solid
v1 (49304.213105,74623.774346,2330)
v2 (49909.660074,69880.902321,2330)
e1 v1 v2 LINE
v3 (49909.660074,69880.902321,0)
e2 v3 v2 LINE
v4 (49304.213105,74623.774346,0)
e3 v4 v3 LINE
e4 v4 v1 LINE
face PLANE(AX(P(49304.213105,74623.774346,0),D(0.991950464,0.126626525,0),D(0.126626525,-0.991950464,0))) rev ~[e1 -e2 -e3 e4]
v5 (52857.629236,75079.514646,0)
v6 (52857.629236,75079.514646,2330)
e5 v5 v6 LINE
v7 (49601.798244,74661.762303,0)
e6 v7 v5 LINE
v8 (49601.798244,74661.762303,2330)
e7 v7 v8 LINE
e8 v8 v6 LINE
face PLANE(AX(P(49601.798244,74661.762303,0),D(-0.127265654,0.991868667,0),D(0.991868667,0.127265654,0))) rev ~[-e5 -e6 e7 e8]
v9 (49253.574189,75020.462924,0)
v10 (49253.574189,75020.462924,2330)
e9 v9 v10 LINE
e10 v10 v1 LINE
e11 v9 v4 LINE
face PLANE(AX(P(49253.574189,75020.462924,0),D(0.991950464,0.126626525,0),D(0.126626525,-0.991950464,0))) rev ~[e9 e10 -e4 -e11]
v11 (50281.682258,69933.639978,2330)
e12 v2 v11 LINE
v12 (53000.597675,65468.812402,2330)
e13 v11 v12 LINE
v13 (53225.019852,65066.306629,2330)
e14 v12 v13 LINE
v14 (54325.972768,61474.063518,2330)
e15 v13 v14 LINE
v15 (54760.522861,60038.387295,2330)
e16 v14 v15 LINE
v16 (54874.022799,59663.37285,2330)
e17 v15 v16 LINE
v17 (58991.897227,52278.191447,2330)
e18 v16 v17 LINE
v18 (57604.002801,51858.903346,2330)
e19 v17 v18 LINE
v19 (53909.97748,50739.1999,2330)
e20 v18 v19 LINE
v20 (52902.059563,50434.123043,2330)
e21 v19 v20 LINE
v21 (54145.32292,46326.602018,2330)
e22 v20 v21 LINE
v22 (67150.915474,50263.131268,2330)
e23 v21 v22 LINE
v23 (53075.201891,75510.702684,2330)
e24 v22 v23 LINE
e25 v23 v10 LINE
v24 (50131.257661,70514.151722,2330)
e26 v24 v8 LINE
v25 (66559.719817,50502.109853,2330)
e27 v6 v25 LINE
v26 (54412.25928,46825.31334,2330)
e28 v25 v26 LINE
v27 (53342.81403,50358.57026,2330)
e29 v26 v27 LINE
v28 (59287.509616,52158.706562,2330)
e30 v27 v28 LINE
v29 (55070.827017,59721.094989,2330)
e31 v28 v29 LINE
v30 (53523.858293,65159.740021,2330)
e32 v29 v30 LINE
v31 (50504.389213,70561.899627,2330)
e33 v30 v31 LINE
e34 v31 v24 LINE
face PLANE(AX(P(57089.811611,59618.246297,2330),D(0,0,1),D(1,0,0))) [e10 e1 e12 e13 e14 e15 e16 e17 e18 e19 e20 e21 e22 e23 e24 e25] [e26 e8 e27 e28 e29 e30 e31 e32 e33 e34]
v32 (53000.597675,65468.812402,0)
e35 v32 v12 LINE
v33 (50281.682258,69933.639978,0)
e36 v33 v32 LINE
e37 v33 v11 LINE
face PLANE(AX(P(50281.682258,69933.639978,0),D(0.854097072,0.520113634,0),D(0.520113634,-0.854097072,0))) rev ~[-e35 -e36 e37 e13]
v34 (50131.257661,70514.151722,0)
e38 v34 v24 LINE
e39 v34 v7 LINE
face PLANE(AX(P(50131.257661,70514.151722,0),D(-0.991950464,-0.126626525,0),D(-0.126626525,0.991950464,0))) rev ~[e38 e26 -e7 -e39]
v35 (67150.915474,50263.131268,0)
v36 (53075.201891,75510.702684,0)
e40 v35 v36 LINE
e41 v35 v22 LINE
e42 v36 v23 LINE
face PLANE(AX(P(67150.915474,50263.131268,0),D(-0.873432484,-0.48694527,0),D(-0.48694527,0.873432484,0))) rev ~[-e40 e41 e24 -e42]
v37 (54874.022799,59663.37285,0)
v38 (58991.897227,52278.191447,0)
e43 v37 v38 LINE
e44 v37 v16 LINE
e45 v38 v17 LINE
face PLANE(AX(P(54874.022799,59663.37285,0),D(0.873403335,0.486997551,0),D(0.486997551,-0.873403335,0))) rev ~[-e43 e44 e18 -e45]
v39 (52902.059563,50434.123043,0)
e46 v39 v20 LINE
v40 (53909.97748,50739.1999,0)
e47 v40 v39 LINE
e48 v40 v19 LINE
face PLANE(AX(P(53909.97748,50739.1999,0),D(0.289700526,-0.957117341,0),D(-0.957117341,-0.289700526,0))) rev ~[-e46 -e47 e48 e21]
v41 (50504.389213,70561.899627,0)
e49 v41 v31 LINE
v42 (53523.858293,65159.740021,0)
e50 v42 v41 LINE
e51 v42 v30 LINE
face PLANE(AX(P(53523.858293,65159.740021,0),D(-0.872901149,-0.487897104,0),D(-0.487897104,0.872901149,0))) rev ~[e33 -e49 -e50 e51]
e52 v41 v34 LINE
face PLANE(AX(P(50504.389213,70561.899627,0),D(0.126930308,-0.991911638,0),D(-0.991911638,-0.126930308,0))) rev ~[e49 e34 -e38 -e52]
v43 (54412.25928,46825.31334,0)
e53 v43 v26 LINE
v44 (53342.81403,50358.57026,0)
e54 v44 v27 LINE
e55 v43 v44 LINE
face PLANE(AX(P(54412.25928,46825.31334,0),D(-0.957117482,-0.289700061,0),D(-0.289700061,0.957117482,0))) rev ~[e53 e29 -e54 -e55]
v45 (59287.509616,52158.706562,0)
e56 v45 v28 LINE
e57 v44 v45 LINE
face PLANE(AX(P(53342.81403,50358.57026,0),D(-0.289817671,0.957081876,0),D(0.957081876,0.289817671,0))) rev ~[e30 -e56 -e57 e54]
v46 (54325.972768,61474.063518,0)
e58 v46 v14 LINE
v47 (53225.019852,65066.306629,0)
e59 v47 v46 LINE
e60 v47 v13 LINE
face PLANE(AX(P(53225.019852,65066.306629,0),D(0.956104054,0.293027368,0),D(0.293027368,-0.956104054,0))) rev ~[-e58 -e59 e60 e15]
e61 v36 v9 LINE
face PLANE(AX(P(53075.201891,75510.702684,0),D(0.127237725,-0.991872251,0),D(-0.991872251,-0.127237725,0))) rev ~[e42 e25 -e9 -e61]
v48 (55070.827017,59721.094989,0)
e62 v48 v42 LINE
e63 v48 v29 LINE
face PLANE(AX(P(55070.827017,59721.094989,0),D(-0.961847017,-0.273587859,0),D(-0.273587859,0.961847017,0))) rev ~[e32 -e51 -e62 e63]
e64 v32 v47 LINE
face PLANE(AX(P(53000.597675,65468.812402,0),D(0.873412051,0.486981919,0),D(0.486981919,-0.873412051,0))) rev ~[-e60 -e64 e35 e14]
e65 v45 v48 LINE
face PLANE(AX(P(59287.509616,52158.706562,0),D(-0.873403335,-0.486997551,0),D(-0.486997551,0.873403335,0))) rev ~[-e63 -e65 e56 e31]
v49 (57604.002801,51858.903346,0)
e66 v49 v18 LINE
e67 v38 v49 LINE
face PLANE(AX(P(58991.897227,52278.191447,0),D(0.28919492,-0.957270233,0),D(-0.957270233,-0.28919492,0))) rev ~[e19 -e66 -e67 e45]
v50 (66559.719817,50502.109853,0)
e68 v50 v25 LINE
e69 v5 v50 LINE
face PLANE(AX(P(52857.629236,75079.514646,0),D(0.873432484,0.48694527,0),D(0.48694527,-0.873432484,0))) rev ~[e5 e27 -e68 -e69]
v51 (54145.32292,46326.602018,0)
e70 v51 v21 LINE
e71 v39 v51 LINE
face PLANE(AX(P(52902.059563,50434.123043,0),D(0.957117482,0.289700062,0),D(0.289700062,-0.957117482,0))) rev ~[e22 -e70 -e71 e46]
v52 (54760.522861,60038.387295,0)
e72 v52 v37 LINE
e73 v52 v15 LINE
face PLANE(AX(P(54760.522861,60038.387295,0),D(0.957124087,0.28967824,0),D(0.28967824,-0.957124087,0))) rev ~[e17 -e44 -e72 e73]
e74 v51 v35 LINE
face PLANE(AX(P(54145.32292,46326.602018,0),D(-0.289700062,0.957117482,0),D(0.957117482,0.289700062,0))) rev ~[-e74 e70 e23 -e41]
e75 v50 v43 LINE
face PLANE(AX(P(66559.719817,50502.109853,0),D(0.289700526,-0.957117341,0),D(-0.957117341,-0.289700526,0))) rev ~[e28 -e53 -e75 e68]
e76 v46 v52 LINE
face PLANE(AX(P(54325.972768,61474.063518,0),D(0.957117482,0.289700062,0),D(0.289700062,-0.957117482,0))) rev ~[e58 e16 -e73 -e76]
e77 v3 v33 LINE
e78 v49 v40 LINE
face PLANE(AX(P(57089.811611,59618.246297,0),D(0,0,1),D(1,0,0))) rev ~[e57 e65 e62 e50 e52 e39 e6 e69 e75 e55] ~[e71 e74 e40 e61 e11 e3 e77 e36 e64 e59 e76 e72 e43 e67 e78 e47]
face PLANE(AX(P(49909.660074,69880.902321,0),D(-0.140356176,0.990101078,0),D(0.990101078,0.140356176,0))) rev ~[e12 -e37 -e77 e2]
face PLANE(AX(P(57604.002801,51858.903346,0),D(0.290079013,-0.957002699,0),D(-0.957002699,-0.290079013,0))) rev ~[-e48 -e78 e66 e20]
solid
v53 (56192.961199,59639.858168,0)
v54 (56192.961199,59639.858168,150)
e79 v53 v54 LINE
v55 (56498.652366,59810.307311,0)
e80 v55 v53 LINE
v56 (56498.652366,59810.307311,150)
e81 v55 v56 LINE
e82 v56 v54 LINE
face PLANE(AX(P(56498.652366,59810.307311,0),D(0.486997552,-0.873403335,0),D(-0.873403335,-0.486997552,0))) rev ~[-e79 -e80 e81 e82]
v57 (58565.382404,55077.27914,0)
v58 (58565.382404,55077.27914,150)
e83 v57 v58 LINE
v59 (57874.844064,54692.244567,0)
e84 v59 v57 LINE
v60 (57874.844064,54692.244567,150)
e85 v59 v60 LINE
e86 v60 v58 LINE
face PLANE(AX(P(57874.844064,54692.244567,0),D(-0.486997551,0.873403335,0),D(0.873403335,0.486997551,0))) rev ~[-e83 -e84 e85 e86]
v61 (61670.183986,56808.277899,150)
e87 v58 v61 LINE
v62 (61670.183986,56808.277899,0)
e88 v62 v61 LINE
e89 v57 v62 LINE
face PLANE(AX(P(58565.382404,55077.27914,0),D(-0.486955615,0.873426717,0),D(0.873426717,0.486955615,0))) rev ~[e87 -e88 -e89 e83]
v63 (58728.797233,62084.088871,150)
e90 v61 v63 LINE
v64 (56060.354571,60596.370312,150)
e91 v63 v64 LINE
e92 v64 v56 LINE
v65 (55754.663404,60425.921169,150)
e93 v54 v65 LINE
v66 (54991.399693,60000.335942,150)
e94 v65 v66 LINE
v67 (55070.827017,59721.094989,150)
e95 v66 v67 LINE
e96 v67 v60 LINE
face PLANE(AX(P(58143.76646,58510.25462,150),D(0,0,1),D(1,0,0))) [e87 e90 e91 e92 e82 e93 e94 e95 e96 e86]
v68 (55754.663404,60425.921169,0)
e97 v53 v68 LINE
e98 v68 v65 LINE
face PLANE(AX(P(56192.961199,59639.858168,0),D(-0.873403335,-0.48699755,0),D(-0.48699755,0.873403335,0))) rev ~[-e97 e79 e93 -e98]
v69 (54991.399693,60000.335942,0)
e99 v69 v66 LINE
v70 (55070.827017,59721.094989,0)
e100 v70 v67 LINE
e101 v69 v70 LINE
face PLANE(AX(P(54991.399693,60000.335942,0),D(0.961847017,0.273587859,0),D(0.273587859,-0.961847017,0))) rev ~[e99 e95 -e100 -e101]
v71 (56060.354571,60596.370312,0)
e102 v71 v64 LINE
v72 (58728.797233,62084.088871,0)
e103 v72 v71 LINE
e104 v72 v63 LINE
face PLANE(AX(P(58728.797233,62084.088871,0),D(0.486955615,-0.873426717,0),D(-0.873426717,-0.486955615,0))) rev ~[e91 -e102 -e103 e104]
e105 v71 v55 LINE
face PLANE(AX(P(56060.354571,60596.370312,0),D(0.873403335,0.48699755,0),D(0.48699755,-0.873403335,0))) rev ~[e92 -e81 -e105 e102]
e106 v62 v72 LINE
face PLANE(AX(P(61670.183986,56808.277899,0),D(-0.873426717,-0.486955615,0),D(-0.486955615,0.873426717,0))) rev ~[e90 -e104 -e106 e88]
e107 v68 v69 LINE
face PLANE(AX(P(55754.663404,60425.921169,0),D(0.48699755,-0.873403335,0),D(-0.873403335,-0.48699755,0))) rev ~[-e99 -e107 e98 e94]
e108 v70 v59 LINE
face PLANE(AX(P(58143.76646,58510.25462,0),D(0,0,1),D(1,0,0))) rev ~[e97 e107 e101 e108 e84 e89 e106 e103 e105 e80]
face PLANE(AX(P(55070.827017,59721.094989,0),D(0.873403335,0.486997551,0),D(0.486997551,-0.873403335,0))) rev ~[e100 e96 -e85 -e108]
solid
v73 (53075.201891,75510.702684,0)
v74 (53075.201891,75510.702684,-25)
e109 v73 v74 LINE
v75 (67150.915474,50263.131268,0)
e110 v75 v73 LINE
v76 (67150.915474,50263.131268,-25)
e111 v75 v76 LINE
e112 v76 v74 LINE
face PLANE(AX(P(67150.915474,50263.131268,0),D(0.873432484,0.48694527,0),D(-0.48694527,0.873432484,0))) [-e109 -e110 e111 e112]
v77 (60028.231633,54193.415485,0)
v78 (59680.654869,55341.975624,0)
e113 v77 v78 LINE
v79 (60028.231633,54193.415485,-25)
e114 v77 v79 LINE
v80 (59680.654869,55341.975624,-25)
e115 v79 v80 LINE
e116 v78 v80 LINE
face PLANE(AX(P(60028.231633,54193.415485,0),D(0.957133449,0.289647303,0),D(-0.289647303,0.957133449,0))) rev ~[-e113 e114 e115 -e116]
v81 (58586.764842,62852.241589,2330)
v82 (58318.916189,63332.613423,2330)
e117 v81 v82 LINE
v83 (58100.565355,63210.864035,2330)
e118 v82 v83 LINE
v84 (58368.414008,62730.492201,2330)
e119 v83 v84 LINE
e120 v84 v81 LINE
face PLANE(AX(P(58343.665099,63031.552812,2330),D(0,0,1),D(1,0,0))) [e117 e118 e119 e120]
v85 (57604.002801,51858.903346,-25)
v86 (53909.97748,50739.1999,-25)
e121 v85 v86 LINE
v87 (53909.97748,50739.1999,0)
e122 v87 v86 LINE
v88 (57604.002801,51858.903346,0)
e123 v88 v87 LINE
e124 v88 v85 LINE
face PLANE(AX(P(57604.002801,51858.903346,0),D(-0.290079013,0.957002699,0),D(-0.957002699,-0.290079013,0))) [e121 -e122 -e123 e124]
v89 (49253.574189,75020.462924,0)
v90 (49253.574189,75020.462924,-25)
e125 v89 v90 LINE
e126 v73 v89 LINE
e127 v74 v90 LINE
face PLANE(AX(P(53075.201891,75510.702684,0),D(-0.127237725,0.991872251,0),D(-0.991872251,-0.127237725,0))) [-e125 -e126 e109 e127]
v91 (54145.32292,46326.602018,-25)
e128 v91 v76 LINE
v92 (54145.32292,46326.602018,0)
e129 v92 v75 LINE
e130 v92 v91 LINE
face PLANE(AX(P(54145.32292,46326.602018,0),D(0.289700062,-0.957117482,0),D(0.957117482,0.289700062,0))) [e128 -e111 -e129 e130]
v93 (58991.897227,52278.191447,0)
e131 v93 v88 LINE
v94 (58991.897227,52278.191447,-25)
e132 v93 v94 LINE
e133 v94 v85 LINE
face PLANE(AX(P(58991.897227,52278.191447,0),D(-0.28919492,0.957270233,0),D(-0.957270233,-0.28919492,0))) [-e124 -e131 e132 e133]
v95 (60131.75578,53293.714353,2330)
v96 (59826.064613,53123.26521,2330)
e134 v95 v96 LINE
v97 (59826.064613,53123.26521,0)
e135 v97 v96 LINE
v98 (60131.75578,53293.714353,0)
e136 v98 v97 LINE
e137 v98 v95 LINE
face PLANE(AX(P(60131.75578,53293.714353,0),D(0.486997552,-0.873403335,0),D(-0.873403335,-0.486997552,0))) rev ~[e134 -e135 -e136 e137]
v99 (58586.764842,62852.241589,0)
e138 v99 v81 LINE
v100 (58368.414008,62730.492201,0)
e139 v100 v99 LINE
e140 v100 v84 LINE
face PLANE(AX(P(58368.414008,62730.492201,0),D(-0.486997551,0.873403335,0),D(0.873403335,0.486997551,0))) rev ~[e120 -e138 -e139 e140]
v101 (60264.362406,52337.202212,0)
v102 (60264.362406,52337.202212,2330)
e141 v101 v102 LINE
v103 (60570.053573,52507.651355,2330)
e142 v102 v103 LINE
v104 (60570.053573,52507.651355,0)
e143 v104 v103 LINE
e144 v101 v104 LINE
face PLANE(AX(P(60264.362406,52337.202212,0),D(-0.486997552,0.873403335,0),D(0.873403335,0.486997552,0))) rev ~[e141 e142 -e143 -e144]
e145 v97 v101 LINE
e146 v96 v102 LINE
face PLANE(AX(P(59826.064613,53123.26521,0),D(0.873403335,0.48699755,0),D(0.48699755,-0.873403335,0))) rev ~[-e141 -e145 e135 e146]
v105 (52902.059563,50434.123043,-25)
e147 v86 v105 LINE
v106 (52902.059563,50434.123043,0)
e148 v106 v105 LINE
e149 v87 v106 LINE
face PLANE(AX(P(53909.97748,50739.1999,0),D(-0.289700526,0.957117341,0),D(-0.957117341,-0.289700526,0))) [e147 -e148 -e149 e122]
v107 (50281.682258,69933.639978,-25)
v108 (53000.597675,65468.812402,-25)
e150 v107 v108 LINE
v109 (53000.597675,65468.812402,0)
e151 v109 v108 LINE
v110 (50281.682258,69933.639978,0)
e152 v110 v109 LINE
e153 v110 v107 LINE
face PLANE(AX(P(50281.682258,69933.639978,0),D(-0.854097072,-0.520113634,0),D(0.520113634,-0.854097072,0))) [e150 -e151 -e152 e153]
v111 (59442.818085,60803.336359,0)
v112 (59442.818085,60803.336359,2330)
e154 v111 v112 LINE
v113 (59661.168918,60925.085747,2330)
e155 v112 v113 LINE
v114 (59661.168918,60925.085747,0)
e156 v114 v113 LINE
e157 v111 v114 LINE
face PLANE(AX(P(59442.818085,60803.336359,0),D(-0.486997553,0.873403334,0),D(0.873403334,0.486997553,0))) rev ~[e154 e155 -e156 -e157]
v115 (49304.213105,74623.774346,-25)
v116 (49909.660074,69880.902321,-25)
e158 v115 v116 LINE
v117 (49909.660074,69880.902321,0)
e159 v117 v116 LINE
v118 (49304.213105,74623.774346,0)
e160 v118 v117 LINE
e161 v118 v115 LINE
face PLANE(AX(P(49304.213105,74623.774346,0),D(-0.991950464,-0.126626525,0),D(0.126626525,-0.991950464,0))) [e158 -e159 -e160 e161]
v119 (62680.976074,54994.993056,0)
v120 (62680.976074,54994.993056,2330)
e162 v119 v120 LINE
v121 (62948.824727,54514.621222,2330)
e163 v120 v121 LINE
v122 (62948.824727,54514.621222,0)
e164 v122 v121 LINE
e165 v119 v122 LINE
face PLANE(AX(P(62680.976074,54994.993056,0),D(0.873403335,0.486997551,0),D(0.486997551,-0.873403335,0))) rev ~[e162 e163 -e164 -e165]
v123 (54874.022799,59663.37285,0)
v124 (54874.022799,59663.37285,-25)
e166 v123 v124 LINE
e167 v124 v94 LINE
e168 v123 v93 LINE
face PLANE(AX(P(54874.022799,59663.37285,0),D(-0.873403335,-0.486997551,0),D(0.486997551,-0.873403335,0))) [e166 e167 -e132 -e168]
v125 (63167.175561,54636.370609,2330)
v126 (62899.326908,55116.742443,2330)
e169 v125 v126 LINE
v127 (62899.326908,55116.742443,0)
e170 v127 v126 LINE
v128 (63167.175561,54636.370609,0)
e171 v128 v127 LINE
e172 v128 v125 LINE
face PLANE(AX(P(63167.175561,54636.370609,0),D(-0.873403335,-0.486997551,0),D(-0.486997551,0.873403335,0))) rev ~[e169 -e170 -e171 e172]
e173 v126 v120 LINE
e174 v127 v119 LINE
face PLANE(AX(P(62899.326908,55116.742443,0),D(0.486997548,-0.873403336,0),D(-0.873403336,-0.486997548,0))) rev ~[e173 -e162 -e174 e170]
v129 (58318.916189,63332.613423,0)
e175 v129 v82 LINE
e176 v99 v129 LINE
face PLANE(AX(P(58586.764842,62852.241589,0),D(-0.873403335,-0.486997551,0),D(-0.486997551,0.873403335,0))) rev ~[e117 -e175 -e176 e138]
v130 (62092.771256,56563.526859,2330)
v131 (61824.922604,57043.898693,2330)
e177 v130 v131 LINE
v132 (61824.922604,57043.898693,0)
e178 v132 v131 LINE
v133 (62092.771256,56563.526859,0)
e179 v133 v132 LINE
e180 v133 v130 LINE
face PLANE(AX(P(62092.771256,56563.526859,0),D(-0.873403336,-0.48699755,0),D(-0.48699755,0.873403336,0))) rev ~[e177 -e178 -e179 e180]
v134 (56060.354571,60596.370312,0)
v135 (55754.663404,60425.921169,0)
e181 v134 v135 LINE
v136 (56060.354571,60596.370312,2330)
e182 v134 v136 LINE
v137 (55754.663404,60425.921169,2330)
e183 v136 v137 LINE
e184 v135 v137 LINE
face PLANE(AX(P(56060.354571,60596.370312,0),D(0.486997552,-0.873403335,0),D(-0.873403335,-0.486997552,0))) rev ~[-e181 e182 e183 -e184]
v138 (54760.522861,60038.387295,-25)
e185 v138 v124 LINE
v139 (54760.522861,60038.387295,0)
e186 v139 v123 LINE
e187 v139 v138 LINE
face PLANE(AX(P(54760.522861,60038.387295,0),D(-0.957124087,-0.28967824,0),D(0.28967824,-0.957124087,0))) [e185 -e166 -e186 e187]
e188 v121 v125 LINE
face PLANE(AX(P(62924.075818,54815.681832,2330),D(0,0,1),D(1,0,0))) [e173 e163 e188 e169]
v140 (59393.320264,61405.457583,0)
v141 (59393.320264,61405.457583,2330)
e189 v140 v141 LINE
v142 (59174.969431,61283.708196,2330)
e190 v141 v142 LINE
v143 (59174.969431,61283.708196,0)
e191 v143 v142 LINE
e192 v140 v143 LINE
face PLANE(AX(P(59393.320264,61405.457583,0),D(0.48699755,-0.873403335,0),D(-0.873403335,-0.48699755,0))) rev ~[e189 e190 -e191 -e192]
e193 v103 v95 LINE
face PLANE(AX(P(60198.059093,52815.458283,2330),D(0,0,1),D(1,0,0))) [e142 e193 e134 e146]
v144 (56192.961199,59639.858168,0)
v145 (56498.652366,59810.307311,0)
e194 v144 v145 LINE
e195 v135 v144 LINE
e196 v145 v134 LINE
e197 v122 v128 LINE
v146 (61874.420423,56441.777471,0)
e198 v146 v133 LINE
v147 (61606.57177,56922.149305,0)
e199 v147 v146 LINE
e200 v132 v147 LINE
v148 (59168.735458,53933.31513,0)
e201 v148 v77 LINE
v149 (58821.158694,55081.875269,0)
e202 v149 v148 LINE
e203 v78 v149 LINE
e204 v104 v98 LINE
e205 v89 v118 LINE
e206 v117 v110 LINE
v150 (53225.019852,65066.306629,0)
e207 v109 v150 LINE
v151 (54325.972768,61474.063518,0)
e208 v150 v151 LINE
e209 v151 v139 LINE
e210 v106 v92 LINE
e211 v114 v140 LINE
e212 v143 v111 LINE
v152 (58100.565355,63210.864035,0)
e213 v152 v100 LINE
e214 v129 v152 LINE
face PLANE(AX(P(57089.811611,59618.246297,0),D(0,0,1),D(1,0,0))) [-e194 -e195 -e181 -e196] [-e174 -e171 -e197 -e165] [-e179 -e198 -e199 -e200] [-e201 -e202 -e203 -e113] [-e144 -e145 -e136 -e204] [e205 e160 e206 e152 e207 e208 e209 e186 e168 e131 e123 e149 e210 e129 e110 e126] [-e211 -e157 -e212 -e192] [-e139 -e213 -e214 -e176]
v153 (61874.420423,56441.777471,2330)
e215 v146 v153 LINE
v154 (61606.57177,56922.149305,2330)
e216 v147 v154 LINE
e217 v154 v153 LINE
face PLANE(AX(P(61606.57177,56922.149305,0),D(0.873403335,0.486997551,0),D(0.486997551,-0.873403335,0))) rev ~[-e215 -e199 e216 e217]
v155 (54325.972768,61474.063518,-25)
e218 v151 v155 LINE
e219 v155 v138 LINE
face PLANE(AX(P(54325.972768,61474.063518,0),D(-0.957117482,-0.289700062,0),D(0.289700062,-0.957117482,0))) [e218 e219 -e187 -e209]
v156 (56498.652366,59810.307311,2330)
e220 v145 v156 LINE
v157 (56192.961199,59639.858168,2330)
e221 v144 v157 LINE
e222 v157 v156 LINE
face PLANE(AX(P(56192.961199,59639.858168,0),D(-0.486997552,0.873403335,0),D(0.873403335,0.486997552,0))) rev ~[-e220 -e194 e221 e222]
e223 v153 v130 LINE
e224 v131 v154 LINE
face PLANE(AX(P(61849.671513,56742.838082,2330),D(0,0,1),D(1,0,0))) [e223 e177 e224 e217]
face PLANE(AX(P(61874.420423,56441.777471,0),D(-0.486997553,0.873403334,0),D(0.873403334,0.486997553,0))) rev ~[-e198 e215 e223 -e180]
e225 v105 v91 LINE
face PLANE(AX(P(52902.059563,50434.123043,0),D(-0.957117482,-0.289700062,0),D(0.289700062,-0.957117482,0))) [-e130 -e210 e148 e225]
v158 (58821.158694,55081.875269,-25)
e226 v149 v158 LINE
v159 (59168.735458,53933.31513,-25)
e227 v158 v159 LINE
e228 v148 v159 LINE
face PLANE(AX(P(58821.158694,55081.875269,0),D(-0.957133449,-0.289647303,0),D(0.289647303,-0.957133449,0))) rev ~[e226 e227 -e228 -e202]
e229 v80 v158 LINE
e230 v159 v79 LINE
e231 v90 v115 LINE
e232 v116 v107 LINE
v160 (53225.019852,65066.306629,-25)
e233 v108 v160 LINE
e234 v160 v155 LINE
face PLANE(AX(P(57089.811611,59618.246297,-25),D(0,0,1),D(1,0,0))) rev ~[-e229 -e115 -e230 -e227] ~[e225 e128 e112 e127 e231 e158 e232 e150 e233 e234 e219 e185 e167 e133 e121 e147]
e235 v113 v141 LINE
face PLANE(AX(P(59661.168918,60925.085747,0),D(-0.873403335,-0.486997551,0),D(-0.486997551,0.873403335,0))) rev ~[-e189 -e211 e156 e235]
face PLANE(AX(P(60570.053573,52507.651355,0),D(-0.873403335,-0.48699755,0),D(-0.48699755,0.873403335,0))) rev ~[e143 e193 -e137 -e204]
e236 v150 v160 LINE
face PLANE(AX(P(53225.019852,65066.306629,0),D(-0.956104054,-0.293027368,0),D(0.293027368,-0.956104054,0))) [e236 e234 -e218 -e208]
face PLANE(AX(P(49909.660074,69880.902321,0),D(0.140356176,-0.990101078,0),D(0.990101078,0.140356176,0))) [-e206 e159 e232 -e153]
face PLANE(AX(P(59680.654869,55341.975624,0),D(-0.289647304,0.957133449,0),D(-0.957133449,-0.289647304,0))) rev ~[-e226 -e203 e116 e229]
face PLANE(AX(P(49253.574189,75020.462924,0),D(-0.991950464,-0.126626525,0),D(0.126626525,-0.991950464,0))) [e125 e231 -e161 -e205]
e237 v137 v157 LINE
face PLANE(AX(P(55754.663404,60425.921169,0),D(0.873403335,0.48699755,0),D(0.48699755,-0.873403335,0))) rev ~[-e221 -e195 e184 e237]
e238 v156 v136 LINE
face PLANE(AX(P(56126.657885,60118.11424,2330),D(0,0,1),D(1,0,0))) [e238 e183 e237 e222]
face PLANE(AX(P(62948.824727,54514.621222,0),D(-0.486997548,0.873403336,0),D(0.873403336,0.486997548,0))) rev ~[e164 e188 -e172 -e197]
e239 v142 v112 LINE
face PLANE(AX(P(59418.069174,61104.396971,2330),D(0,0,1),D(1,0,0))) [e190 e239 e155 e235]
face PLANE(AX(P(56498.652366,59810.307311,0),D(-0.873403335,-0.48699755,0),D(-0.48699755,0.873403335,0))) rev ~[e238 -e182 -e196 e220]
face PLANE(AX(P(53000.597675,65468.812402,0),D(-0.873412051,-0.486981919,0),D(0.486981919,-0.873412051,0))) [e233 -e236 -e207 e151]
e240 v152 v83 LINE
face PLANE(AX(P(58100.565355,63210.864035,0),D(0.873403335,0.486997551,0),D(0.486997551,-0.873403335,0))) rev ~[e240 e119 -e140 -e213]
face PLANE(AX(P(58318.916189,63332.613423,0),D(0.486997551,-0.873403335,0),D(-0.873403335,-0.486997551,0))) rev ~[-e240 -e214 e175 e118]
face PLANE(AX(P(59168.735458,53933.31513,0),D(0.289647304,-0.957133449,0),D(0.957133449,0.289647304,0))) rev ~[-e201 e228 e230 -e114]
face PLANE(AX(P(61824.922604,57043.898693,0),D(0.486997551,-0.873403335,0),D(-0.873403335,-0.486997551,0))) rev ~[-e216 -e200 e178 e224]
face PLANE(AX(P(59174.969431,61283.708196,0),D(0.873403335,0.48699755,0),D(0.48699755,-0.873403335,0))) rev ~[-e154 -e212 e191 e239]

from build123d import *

# Parameters (mm, degrees)
F3_DEPTH  = 2330
F5_DEPTH  = 25
F7_DEPTH  = 2330
F9_DEPTH  = 150
F11_DEPTH = 25.001


# Not quite as in the source:
# - ends of sketch curves that miss each other by under 0.0002 mm in the source are joined


with BuildPart() as f3:
    # F2 (on Top) → F3 (new body)
    with BuildSketch(Plane.XY):
        Polygon((52902.0595629306, 50434.1230428591), (54145.32292, 46326.602018), (54431.4219269024, 46413.1983883223), (67150.915474, 50263.131268), (53075.201891, 75510.702684), (49253.5741891713, 75020.4629237414), (49304.213105, 74623.774346), (49909.660074, 69880.902321), (50281.682258, 69933.639978), (53000.597675, 65468.812402), (53225.019852, 65066.306629), (54325.972768, 61474.063518), (54760.522861, 60038.387295), (54874.022799, 59663.37285), (58991.897227, 52278.191447), (57604.002801, 51858.903346), (53909.97748, 50739.1999), align=None)
        Polygon((54412.25928, 46825.31334), (53342.81403, 50358.57026), (59287.509616, 52158.706562), (55070.827017, 59721.094989), (53523.858293, 65159.740021), (50504.389213421, 70561.8996273451), (50131.257661, 70514.151722), (49601.798244, 74661.762303), (52857.629236, 75079.514646), (66559.719817, 50502.109853), align=None, mode=Mode.SUBTRACT)
    extrude(amount=F3_DEPTH)


with BuildPart() as f5:
    # F4 (on Top) → F5 (new body)
    with BuildSketch(Plane.XY):
        Polygon((54760.522861, 60038.387295), (54874.022799, 59663.37285), (58991.897227, 52278.191447), (57604.002801, 51858.903346), (53909.97748, 50739.1999), (52902.0595629306, 50434.1230428591), (54145.32292, 46326.602018), (67150.915474, 50263.131268), (53075.201891, 75510.702684), (49253.5741891713, 75020.4629237414), (49304.213105, 74623.774346), (49909.660074, 69880.902321), (50281.682258, 69933.639978), (53000.597675, 65468.812402), (53225.019852, 65066.306629), (54325.972768, 61474.063518), align=None)
    extrude(amount=-F5_DEPTH)

    # F6 (on Top) → F7 (join)
    with BuildSketch(Plane.XY):
        Polygon((63167.175561, 54636.370609), (62899.326908, 55116.742443), (62680.976074, 54994.993056), (62948.824727, 54514.621222), align=None)
        Polygon((61606.57177, 56922.149305), (61874.420423, 56441.777471), (62092.771256, 56563.526859), (61824.922604, 57043.898693), align=None)
        Polygon((60131.75578, 53293.714353), (59826.064613, 53123.26521), (60264.362406, 52337.202212), (60570.053573, 52507.651355), align=None)
        Polygon((56498.652366, 59810.307311), (56060.354571, 60596.370312), (55754.663404, 60425.921169), (56192.961199, 59639.858168), align=None)
        Polygon((59393.320264, 61405.457583), (59174.969431, 61283.708196), (59442.818085, 60803.336359), (59661.168918, 60925.085747), align=None)
        Polygon((58586.764842, 62852.241589), (58318.916189, 63332.613423), (58100.565355, 63210.864035), (58368.414008, 62730.492201), align=None)
    extrude(amount=F7_DEPTH)

    # F10 (on face) → F11 (cut, through all)
    with BuildSketch(Plane.XY):
        Polygon((59168.735458, 53933.31513), (60028.231633, 54193.415485), (59680.654869, 55341.975624), (58821.158694, 55081.875269), align=None)
    extrude(amount=-F11_DEPTH, mode=Mode.SUBTRACT)


with BuildPart() as f9:
    # F8 (on Top) → F9 (new body)
    with BuildSketch(Plane.XY):
        Polygon((58728.797232615, 62084.088870835), (56060.354571, 60596.370312), (56498.652366, 59810.307311), (56192.961199, 59639.858168), (55754.663404, 60425.921169), (54991.3996931603, 60000.3359416475), (55070.827017, 59721.094989), (55102.8168784927, 59663.7229310719), (57874.844064254, 54692.2445670372), (58565.3824039826, 55077.2791403316), (61670.1839855803, 56808.2778988538), align=None)
    extrude(amount=F9_DEPTH)


solid = Compound([f3.part, f5.part, f9.part])
